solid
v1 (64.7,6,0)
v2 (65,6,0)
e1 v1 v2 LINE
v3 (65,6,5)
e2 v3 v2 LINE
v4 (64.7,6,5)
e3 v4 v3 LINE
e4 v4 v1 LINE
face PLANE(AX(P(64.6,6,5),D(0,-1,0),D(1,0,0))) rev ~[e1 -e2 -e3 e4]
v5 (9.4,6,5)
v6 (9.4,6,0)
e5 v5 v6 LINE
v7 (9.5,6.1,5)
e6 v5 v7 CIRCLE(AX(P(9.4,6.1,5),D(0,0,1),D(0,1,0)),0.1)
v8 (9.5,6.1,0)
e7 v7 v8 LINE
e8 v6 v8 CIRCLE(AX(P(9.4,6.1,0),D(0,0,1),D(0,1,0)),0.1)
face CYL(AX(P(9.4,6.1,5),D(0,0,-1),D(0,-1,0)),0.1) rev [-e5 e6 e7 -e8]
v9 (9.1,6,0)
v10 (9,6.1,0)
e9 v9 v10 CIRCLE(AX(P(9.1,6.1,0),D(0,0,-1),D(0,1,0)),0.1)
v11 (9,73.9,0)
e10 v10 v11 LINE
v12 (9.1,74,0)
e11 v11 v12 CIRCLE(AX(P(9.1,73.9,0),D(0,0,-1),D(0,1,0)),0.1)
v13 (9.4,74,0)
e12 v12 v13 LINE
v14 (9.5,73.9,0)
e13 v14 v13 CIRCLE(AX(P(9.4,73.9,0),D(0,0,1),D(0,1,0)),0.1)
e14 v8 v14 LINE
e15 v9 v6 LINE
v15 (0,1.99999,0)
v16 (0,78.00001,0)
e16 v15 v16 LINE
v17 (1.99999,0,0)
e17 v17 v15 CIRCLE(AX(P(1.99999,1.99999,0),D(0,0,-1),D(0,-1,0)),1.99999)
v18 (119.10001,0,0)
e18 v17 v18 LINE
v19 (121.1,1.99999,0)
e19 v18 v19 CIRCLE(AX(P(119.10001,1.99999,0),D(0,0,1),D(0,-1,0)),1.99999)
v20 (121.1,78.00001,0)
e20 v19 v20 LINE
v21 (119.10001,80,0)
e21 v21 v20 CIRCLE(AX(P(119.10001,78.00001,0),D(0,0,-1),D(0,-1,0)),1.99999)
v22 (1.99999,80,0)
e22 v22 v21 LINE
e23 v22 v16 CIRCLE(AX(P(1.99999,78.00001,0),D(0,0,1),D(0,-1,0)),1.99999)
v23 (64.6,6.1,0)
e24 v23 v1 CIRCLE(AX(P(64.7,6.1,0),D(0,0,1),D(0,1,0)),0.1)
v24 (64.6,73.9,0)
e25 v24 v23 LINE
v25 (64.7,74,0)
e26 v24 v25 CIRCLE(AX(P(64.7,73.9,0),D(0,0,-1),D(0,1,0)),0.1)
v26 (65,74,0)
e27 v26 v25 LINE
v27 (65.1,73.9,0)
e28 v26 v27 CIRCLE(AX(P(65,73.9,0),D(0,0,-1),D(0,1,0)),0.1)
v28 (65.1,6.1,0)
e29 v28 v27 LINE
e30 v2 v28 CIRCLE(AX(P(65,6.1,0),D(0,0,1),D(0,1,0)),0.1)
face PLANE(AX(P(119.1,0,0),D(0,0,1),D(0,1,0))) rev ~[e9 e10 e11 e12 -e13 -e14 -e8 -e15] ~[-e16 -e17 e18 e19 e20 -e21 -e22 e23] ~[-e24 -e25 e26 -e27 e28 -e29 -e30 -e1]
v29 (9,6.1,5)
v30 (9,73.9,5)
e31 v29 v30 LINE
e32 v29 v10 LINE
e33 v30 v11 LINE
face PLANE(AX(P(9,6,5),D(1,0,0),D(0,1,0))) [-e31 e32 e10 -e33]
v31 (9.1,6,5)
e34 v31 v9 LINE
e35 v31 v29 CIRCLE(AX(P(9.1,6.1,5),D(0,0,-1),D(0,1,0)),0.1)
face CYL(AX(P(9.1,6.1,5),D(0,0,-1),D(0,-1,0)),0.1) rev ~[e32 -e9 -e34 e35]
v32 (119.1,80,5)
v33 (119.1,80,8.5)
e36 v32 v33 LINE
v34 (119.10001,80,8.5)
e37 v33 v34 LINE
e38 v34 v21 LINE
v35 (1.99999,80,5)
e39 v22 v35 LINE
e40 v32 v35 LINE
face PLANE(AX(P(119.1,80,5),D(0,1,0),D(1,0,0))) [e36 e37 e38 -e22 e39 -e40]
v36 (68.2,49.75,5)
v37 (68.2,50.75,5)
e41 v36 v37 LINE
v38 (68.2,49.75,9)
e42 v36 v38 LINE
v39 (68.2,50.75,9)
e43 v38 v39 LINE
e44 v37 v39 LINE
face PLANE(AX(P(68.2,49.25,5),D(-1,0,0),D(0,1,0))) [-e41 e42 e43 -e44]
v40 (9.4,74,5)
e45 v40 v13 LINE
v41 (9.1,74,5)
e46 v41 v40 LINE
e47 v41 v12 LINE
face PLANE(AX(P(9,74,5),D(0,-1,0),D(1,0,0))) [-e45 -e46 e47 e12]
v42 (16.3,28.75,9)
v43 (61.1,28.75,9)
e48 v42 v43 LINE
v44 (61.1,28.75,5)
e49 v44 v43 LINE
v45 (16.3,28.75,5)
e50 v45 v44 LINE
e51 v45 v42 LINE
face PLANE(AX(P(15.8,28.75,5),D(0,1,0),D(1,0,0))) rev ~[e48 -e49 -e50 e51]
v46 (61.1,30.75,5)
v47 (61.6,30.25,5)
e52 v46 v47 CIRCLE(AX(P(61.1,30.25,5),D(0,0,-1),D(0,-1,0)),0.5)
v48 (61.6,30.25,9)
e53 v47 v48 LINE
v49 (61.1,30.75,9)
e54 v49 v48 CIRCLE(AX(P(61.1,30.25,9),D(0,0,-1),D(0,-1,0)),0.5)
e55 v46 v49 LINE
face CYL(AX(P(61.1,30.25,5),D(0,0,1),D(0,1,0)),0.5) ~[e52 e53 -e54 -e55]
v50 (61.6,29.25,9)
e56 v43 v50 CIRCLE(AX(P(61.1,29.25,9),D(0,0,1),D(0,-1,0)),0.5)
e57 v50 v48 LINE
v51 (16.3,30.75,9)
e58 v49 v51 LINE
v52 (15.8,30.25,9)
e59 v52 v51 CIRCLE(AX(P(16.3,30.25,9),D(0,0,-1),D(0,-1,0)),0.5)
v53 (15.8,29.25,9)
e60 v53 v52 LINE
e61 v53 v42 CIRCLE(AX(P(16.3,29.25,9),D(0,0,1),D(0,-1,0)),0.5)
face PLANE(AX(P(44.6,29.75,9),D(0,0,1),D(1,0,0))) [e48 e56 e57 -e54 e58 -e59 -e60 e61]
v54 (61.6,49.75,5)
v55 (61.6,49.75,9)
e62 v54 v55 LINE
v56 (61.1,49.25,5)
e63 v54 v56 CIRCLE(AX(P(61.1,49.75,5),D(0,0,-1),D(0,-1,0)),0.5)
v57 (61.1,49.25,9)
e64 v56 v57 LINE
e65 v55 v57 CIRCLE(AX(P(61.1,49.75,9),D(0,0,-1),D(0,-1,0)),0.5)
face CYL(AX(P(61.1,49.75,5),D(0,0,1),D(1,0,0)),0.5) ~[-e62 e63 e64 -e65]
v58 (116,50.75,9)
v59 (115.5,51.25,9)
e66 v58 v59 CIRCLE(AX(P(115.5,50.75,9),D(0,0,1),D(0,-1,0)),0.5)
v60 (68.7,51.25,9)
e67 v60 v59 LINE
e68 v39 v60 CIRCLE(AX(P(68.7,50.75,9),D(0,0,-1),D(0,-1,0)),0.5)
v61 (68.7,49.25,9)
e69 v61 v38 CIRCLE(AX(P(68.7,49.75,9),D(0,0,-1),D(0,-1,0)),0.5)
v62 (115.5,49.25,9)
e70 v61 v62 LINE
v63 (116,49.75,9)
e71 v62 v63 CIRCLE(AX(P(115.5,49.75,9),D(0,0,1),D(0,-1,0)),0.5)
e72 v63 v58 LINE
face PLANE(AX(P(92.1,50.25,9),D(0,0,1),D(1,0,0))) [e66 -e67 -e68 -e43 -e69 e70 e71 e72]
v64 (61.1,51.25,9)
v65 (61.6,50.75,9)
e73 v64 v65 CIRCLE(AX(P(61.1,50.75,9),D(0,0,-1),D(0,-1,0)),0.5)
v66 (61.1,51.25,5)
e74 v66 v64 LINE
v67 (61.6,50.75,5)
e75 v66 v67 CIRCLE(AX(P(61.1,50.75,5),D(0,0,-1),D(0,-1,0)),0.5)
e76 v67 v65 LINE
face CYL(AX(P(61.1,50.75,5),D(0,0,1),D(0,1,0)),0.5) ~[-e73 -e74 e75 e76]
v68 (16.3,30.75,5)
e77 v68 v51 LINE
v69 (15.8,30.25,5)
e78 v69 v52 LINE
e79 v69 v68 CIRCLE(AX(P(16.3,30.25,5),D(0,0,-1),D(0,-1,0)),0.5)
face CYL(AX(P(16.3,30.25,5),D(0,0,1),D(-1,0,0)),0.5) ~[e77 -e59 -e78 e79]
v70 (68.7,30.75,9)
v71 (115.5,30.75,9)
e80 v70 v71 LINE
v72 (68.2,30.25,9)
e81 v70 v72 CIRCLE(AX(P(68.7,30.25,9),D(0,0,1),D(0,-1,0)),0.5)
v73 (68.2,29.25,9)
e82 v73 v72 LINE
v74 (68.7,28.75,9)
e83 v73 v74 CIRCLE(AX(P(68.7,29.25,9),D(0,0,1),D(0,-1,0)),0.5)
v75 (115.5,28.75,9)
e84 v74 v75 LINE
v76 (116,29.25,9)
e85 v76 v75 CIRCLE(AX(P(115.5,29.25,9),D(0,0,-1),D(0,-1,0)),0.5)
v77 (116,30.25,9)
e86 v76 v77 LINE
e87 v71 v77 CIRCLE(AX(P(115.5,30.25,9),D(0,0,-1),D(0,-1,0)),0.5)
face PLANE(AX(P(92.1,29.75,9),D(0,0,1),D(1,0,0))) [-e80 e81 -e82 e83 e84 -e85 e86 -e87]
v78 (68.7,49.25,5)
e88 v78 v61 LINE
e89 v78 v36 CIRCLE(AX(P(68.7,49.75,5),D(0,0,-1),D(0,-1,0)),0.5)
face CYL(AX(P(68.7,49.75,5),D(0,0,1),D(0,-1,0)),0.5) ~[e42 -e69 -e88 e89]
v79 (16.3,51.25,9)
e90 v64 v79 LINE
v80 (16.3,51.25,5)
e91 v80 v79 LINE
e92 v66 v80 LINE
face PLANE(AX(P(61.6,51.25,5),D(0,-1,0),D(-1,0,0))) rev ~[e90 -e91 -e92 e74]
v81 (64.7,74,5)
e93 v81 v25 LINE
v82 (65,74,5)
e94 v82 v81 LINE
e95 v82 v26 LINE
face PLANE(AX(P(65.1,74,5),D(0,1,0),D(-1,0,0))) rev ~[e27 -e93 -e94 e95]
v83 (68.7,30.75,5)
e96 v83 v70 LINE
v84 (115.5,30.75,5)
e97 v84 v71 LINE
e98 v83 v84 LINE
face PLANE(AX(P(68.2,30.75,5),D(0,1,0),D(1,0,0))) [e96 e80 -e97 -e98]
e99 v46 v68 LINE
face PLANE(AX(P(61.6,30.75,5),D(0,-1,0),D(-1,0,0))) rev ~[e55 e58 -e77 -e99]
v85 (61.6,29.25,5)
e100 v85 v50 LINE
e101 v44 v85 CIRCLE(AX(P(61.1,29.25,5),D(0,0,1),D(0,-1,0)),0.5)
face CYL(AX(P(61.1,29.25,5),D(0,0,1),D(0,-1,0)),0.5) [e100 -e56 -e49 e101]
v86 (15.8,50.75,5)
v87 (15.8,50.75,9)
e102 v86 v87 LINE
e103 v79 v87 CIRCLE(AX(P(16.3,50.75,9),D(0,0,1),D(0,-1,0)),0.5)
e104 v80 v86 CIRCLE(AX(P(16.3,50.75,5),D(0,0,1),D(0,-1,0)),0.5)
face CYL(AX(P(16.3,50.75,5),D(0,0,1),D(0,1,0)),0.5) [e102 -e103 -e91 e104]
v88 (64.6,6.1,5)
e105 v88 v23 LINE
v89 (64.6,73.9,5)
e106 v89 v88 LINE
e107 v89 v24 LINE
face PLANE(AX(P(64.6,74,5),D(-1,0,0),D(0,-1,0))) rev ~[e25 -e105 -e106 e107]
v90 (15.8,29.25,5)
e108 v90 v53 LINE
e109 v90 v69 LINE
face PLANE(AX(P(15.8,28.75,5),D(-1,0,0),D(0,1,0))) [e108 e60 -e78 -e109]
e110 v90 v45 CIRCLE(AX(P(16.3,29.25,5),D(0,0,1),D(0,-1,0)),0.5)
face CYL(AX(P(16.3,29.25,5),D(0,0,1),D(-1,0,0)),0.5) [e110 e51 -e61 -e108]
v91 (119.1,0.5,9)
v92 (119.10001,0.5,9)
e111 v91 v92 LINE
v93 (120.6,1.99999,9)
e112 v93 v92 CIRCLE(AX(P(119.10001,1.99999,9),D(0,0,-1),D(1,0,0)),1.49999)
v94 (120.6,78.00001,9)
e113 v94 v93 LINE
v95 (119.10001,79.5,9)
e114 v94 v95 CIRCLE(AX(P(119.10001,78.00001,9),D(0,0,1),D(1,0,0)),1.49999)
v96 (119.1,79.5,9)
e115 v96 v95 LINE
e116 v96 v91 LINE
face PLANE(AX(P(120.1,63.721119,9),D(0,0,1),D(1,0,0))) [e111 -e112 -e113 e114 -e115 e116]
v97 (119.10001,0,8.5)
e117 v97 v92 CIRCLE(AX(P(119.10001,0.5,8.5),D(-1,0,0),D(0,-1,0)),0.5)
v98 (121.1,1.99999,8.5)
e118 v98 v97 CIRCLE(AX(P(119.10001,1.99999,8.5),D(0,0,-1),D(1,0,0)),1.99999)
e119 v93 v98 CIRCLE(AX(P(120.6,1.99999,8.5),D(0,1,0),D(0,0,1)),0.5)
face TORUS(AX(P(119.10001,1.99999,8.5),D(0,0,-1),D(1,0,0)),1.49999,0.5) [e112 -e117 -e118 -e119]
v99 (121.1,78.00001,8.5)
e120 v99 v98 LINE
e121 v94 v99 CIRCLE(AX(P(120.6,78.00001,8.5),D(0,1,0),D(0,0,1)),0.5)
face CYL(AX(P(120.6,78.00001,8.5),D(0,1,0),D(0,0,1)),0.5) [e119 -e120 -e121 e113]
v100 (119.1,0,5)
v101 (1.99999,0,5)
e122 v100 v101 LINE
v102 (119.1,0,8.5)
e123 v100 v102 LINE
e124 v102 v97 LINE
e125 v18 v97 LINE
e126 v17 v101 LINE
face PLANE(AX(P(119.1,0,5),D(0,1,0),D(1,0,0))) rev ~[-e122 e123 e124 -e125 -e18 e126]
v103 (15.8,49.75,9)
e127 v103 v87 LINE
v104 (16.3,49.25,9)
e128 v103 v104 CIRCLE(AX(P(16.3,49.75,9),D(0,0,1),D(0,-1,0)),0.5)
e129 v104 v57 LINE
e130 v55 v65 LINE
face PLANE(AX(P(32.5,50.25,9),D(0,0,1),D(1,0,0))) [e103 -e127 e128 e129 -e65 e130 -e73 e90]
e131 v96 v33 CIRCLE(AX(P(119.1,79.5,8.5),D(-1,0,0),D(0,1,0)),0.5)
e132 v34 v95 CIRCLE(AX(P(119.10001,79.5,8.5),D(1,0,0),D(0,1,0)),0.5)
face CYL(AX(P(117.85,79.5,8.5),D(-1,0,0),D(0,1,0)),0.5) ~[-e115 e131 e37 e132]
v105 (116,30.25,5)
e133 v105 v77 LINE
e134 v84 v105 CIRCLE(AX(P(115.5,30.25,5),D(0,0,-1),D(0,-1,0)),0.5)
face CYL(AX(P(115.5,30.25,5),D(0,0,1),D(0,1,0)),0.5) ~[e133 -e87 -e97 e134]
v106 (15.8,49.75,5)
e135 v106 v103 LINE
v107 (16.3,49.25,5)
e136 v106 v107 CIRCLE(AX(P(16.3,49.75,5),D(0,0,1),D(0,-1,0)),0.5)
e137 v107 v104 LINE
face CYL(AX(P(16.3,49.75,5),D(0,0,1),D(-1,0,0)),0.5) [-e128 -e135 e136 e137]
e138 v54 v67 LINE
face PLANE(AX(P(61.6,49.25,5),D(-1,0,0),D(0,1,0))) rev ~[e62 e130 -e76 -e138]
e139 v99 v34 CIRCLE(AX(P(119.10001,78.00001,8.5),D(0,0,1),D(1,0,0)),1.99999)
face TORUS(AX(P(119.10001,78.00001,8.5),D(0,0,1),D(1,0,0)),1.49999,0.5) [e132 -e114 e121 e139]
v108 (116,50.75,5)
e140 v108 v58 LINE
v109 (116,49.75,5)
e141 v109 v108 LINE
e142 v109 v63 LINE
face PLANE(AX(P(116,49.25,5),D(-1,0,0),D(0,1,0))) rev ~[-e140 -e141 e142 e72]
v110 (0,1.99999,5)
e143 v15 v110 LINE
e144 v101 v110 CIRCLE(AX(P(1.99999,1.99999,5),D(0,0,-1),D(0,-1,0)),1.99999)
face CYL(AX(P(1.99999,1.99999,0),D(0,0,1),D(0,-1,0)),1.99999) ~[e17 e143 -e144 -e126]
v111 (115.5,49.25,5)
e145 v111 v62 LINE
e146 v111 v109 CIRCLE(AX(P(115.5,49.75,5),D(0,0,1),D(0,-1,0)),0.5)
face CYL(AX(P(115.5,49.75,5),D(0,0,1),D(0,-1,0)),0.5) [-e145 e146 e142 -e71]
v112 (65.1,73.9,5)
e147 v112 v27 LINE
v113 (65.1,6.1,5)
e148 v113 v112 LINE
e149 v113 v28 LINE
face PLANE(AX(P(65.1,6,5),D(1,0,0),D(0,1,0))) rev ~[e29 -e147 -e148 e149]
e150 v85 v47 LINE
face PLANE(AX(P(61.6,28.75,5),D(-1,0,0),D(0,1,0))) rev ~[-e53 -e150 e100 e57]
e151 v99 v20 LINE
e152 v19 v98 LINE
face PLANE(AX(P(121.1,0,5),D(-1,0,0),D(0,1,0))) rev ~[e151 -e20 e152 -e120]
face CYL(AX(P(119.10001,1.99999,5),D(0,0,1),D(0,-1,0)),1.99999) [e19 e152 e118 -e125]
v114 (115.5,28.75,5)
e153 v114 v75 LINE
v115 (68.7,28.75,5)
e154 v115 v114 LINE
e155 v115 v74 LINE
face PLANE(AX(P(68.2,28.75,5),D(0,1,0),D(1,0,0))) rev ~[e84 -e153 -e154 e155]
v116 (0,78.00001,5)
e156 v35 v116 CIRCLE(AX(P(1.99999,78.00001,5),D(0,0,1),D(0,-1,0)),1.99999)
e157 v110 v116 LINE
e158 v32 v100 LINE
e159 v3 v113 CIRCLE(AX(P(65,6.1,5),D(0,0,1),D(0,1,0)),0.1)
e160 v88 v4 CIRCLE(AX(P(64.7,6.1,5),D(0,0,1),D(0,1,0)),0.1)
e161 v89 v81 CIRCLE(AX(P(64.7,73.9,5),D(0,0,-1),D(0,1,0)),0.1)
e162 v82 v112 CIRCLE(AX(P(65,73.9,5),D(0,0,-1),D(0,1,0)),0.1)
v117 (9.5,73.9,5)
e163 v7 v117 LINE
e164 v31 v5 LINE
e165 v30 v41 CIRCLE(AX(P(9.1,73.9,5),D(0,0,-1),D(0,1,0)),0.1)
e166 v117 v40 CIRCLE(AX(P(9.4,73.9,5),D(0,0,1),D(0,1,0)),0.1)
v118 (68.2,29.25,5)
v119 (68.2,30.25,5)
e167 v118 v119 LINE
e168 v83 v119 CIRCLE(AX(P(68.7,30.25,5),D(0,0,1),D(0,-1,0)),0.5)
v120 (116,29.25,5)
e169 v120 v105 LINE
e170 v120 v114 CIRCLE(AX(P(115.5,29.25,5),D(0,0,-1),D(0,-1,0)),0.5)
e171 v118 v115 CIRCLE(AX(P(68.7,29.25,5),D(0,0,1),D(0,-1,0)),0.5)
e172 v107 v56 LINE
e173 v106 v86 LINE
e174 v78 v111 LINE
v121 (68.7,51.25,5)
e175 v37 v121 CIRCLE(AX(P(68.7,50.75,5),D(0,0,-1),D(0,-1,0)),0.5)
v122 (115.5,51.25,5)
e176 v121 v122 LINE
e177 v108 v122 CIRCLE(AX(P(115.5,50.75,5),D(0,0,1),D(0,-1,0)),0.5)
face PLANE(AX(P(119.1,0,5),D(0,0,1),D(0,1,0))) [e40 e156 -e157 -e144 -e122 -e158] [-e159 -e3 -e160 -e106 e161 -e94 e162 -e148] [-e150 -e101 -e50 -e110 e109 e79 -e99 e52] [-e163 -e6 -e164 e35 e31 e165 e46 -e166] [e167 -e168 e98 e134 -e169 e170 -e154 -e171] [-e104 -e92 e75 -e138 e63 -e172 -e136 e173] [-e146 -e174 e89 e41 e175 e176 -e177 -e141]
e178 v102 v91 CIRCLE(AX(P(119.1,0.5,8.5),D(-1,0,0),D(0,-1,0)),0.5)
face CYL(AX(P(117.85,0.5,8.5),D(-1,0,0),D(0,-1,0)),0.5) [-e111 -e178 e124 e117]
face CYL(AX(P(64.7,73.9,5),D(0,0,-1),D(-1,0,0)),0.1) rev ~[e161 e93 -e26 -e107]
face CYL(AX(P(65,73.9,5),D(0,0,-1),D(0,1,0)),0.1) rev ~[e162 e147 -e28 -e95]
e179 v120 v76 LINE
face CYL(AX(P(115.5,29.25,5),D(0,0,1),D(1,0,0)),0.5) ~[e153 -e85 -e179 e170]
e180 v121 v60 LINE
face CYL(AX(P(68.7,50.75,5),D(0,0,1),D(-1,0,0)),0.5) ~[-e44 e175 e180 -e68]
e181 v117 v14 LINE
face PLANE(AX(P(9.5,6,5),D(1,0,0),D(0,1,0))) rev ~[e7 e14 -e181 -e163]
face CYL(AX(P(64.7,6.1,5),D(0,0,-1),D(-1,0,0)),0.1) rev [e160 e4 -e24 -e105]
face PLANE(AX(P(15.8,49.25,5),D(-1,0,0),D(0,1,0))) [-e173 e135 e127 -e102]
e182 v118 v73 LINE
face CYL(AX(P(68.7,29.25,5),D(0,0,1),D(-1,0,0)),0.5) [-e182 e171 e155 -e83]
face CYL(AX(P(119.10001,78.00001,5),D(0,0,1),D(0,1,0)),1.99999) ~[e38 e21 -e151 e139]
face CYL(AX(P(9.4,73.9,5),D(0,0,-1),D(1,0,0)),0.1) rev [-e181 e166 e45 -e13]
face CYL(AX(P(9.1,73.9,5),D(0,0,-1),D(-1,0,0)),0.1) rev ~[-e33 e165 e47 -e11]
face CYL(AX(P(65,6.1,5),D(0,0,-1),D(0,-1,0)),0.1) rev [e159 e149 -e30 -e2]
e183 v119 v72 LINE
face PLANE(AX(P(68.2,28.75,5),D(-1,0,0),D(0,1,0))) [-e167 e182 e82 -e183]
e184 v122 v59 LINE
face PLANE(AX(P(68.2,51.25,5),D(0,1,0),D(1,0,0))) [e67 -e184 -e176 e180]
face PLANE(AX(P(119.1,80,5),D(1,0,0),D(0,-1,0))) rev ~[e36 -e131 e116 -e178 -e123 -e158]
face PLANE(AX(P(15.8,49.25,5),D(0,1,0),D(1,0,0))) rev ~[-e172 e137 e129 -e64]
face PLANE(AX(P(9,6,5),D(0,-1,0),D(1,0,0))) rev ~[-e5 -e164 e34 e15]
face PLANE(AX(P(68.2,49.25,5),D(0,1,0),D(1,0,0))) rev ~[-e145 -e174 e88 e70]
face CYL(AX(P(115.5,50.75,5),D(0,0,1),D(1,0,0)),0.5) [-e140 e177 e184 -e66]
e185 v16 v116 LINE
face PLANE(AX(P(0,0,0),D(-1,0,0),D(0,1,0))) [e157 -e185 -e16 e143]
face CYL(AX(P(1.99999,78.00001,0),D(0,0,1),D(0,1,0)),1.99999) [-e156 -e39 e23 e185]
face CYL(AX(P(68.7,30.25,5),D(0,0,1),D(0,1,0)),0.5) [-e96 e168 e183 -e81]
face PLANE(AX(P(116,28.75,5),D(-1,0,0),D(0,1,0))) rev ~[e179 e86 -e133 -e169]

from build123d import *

# Parameters (mm, degrees)
F0_W         = 119.1
F0_H         = 80
F1_DEPTH     = 5
F3_DEPTH     = 63.1
F4_W         = 6.8
F4_H         = 2
F4_W_2       = 7
F4_W_3       = 6.5
F5_DEPTH     = 4
F6_W         = 47.8
F6_H         = 2
F7_DEPTH     = 4
F8_W         = 0.5
F8_H         = 68
F9_DEPTH     = 25
F10_W        = 80
F10_H        = 5
F11_DEPTH    = 2
F12_W        = 2
F12_H        = 32.5577612221
F12_H_2      = 47.4422387779
F13_DEPTH    = 4
F14_R        = 1.99999
F15_R        = 0.5
F16_R        = 0.1
F17_T1_DEPTH = 76.00002
F17_T3_DEPTH = 1.25001
F17_T6_ANGLE = 90
F17_T8_ANGLE = 90


# Not quite as in the source:
# - a fillet or chamfer that OpenCascade refuses, or shapes differently, is made with other operations: its cross-section is extruded or revolved along the edge and cut away or added
# - a fillet or chamfer is up to 0.001 mm smaller than in the source, because OpenCascade refuses the exact size


with BuildPart() as f1:
    # F0 (on Top) → F1 (new body)
    with BuildSketch(Plane.XY):
        with Locations((59.55, 40)):
            Rectangle(F0_W, F0_H)
    extrude(amount=F1_DEPTH)

    # F2 (on face) → F3 (cut)
    with BuildSketch(Plane.XY.offset(5)):
        Polygon((64.6, 74), (64.6, 25), (64.6, 6), (65.1, 6), (65.1, 74), align=None)
    extrude(amount=-F3_DEPTH, mode=Mode.SUBTRACT)

    # F4 (on face) → F5 (join)
    with BuildSketch(Plane.XY.offset(5)):
        with Locations((32.5, 50.25)):
            Rectangle(F4_W, F4_H)
        Polygon((35.9, 49.25), (39.1217214942, 49.25), (41.1, 49.25), (41.1, 51.25), (35.9, 51.25), align=None)
        with Locations((44.6, 50.25)):
            Rectangle(F4_W_2, F4_H)
        with Locations((51.35, 50.25)):
            Rectangle(F4_W_3, F4_H)
        with Locations((19.2, 50.25)):
            Rectangle(F4_W, F4_H)
        with Locations((25.85, 50.25)):
            Rectangle(F4_W_3, F4_H)
        with Locations((58.1, 50.25)):
            Rectangle(F4_W_2, F4_H)
        with Locations((44.6, 29.75)):
            Rectangle(F4_W_2, F4_H)
        with Locations((32.5, 29.75)):
            Rectangle(F4_W, F4_H)
        with Locations((58.1, 29.75)):
            Rectangle(F4_W_2, F4_H)
        Polygon((41.1, 30.75), (39.1217214942, 30.75), (35.9, 30.75), (35.9, 28.75), (39.8, 28.75), (41.1, 28.75), align=None)
        with Locations((51.35, 29.75)):
            Rectangle(F4_W_3, F4_H)
        with Locations((25.85, 29.75)):
            Rectangle(F4_W_3, F4_H)
        with Locations((19.2, 29.75)):
            Rectangle(F4_W, F4_H)
    extrude(amount=F5_DEPTH)

    # F6 (on face) → F7 (join)
    with BuildSketch(Plane.XY.offset(5)):
        with Locations((92.1, 50.25)):
            Rectangle(F6_W, F6_H)
        with Locations((92.1, 29.75)):
            Rectangle(F6_W, F6_H)
    extrude(amount=F7_DEPTH)

    # F8 (on face) → F9 (cut)
    with BuildSketch(Plane.XY.offset(5)):
        with Locations((9.25, 40)):
            Rectangle(F8_W, F8_H)
    extrude(amount=-F9_DEPTH, mode=Mode.SUBTRACT)

    # F10 (on face) → F11 (join)
    with BuildSketch(Plane.YZ.offset(119.1)):
        with Locations((40, 2.5)):
            Rectangle(F10_W, F10_H)
    extrude(amount=F11_DEPTH)

    # F12 (on face) → F13 (join)
    with BuildSketch(Plane.XY.offset(5)):
        with Locations((120.1, 63.7211193889)):
            Rectangle(F12_W, F12_H)
        with Locations((120.1, 23.7211193889)):
            Rectangle(F12_W, F12_H_2)
    extrude(amount=F13_DEPTH)

    # F14 (radius 2 in the source; OpenCascade refuses exactly that, so slightly less here)
    f14_edges = [f1.edges().sort_by_distance(p)[0] for p in [
        (0, 80, 2.5),
        (0, 0, 2.5),
        (121.1, 80, 4.5),
        (121.1, 0, 4.5),
    ]]
    fillet(f14_edges, radius=F14_R)

    # F15
    f15_edges = [f1.edges().sort_by_distance(p)[0] for p in [
        (15.8, 49.25, 7),
        (15.8, 51.25, 7),
        (61.6, 49.25, 7),
        (61.6, 51.25, 7),
        (68.2, 49.25, 7),
        (68.2, 51.25, 7),
        (116, 49.25, 7),
        (116, 51.25, 7),
        (116, 28.75, 7),
        (116, 30.75, 7),
        (68.2, 28.75, 7),
        (68.2, 30.75, 7),
        (61.6, 28.75, 7),
        (61.6, 30.75, 7),
        (15.8, 28.75, 7),
        (15.8, 30.75, 7),
    ]]
    fillet(f15_edges, radius=F15_R)

    # F16
    f16_edges = [f1.edges().sort_by_distance(p)[0] for p in [
        (9.5, 6, 2.5),
        (9, 6, 2.5),
        (9.5, 74, 2.5),
        (9, 74, 2.5),
        (64.6, 74, 2.5),
        (65.1, 74, 2.5),
        (64.6, 6, 2.5),
        (65.1, 6, 2.5),
    ]]
    fillet(f16_edges, radius=F16_R)

    # F17: fillet of radius 0.5 on 1 edges, made by hand

    # F17_s2 → F17_t1 (cut)
    with BuildSketch(Plane.XZ.offset(-78.00001)):
        with BuildLine():
            ThreePointArc((120.6, 9), (120.9535533906, 8.8535533906), (121.1, 8.5))
            Line((121.1, 8.5), (121.1, 9))
            Line((121.1, 9), (120.6, 9))
        make_face()
    extrude(amount=F17_T1_DEPTH, mode=Mode.SUBTRACT)

    # F17_s4 → F17_t3 (cut)
    with BuildSketch(Plane.YZ.offset(117.85)):
        with BuildLine():
            ThreePointArc((80, 8.5), (79.8535533906, 8.8535533906), (79.5, 9))
            Line((79.5, 9), (80, 9))
            Line((80, 9), (80, 8.5))
        make_face()
        with BuildLine():
            ThreePointArc((0, 8.5), (0.1464466094, 8.8535533906), (0.5, 9))
            Line((0.5, 9), (0, 9))
            Line((0, 9), (0, 8.5))
        make_face()
    extrude(amount=F17_T3_DEPTH, mode=Mode.SUBTRACT)

    # F17_s5 → F17_t6 (revolve, cut)
    with BuildSketch(Plane.XZ.offset(-1.99999)):
        with BuildLine():
            ThreePointArc((120.6, 9), (120.9535533906, 8.8535533906), (121.1, 8.5))
            Line((121.1, 8.5), (121.1, 9))
            Line((121.1, 9), (120.6, 9))
        make_face()
    revolve(axis=Axis((119.10001, 1.99999, 9), (0, 0, -1)), revolution_arc=F17_T6_ANGLE, mode=Mode.SUBTRACT)

    # F17_s7 → F17_t8 (revolve, cut)
    with BuildSketch(Plane.XZ.offset(-78.00001)):
        with BuildLine():
            ThreePointArc((121.1, 8.5), (120.9535533906, 8.8535533906), (120.6, 9))
            Line((120.6, 9), (121.1, 9))
            Line((121.1, 9), (121.1, 8.5))
        make_face()
    revolve(axis=Axis((119.10001, 78.00001, 9), (0, 0, 1)), revolution_arc=F17_T8_ANGLE, mode=Mode.SUBTRACT)


solid = f1.part
